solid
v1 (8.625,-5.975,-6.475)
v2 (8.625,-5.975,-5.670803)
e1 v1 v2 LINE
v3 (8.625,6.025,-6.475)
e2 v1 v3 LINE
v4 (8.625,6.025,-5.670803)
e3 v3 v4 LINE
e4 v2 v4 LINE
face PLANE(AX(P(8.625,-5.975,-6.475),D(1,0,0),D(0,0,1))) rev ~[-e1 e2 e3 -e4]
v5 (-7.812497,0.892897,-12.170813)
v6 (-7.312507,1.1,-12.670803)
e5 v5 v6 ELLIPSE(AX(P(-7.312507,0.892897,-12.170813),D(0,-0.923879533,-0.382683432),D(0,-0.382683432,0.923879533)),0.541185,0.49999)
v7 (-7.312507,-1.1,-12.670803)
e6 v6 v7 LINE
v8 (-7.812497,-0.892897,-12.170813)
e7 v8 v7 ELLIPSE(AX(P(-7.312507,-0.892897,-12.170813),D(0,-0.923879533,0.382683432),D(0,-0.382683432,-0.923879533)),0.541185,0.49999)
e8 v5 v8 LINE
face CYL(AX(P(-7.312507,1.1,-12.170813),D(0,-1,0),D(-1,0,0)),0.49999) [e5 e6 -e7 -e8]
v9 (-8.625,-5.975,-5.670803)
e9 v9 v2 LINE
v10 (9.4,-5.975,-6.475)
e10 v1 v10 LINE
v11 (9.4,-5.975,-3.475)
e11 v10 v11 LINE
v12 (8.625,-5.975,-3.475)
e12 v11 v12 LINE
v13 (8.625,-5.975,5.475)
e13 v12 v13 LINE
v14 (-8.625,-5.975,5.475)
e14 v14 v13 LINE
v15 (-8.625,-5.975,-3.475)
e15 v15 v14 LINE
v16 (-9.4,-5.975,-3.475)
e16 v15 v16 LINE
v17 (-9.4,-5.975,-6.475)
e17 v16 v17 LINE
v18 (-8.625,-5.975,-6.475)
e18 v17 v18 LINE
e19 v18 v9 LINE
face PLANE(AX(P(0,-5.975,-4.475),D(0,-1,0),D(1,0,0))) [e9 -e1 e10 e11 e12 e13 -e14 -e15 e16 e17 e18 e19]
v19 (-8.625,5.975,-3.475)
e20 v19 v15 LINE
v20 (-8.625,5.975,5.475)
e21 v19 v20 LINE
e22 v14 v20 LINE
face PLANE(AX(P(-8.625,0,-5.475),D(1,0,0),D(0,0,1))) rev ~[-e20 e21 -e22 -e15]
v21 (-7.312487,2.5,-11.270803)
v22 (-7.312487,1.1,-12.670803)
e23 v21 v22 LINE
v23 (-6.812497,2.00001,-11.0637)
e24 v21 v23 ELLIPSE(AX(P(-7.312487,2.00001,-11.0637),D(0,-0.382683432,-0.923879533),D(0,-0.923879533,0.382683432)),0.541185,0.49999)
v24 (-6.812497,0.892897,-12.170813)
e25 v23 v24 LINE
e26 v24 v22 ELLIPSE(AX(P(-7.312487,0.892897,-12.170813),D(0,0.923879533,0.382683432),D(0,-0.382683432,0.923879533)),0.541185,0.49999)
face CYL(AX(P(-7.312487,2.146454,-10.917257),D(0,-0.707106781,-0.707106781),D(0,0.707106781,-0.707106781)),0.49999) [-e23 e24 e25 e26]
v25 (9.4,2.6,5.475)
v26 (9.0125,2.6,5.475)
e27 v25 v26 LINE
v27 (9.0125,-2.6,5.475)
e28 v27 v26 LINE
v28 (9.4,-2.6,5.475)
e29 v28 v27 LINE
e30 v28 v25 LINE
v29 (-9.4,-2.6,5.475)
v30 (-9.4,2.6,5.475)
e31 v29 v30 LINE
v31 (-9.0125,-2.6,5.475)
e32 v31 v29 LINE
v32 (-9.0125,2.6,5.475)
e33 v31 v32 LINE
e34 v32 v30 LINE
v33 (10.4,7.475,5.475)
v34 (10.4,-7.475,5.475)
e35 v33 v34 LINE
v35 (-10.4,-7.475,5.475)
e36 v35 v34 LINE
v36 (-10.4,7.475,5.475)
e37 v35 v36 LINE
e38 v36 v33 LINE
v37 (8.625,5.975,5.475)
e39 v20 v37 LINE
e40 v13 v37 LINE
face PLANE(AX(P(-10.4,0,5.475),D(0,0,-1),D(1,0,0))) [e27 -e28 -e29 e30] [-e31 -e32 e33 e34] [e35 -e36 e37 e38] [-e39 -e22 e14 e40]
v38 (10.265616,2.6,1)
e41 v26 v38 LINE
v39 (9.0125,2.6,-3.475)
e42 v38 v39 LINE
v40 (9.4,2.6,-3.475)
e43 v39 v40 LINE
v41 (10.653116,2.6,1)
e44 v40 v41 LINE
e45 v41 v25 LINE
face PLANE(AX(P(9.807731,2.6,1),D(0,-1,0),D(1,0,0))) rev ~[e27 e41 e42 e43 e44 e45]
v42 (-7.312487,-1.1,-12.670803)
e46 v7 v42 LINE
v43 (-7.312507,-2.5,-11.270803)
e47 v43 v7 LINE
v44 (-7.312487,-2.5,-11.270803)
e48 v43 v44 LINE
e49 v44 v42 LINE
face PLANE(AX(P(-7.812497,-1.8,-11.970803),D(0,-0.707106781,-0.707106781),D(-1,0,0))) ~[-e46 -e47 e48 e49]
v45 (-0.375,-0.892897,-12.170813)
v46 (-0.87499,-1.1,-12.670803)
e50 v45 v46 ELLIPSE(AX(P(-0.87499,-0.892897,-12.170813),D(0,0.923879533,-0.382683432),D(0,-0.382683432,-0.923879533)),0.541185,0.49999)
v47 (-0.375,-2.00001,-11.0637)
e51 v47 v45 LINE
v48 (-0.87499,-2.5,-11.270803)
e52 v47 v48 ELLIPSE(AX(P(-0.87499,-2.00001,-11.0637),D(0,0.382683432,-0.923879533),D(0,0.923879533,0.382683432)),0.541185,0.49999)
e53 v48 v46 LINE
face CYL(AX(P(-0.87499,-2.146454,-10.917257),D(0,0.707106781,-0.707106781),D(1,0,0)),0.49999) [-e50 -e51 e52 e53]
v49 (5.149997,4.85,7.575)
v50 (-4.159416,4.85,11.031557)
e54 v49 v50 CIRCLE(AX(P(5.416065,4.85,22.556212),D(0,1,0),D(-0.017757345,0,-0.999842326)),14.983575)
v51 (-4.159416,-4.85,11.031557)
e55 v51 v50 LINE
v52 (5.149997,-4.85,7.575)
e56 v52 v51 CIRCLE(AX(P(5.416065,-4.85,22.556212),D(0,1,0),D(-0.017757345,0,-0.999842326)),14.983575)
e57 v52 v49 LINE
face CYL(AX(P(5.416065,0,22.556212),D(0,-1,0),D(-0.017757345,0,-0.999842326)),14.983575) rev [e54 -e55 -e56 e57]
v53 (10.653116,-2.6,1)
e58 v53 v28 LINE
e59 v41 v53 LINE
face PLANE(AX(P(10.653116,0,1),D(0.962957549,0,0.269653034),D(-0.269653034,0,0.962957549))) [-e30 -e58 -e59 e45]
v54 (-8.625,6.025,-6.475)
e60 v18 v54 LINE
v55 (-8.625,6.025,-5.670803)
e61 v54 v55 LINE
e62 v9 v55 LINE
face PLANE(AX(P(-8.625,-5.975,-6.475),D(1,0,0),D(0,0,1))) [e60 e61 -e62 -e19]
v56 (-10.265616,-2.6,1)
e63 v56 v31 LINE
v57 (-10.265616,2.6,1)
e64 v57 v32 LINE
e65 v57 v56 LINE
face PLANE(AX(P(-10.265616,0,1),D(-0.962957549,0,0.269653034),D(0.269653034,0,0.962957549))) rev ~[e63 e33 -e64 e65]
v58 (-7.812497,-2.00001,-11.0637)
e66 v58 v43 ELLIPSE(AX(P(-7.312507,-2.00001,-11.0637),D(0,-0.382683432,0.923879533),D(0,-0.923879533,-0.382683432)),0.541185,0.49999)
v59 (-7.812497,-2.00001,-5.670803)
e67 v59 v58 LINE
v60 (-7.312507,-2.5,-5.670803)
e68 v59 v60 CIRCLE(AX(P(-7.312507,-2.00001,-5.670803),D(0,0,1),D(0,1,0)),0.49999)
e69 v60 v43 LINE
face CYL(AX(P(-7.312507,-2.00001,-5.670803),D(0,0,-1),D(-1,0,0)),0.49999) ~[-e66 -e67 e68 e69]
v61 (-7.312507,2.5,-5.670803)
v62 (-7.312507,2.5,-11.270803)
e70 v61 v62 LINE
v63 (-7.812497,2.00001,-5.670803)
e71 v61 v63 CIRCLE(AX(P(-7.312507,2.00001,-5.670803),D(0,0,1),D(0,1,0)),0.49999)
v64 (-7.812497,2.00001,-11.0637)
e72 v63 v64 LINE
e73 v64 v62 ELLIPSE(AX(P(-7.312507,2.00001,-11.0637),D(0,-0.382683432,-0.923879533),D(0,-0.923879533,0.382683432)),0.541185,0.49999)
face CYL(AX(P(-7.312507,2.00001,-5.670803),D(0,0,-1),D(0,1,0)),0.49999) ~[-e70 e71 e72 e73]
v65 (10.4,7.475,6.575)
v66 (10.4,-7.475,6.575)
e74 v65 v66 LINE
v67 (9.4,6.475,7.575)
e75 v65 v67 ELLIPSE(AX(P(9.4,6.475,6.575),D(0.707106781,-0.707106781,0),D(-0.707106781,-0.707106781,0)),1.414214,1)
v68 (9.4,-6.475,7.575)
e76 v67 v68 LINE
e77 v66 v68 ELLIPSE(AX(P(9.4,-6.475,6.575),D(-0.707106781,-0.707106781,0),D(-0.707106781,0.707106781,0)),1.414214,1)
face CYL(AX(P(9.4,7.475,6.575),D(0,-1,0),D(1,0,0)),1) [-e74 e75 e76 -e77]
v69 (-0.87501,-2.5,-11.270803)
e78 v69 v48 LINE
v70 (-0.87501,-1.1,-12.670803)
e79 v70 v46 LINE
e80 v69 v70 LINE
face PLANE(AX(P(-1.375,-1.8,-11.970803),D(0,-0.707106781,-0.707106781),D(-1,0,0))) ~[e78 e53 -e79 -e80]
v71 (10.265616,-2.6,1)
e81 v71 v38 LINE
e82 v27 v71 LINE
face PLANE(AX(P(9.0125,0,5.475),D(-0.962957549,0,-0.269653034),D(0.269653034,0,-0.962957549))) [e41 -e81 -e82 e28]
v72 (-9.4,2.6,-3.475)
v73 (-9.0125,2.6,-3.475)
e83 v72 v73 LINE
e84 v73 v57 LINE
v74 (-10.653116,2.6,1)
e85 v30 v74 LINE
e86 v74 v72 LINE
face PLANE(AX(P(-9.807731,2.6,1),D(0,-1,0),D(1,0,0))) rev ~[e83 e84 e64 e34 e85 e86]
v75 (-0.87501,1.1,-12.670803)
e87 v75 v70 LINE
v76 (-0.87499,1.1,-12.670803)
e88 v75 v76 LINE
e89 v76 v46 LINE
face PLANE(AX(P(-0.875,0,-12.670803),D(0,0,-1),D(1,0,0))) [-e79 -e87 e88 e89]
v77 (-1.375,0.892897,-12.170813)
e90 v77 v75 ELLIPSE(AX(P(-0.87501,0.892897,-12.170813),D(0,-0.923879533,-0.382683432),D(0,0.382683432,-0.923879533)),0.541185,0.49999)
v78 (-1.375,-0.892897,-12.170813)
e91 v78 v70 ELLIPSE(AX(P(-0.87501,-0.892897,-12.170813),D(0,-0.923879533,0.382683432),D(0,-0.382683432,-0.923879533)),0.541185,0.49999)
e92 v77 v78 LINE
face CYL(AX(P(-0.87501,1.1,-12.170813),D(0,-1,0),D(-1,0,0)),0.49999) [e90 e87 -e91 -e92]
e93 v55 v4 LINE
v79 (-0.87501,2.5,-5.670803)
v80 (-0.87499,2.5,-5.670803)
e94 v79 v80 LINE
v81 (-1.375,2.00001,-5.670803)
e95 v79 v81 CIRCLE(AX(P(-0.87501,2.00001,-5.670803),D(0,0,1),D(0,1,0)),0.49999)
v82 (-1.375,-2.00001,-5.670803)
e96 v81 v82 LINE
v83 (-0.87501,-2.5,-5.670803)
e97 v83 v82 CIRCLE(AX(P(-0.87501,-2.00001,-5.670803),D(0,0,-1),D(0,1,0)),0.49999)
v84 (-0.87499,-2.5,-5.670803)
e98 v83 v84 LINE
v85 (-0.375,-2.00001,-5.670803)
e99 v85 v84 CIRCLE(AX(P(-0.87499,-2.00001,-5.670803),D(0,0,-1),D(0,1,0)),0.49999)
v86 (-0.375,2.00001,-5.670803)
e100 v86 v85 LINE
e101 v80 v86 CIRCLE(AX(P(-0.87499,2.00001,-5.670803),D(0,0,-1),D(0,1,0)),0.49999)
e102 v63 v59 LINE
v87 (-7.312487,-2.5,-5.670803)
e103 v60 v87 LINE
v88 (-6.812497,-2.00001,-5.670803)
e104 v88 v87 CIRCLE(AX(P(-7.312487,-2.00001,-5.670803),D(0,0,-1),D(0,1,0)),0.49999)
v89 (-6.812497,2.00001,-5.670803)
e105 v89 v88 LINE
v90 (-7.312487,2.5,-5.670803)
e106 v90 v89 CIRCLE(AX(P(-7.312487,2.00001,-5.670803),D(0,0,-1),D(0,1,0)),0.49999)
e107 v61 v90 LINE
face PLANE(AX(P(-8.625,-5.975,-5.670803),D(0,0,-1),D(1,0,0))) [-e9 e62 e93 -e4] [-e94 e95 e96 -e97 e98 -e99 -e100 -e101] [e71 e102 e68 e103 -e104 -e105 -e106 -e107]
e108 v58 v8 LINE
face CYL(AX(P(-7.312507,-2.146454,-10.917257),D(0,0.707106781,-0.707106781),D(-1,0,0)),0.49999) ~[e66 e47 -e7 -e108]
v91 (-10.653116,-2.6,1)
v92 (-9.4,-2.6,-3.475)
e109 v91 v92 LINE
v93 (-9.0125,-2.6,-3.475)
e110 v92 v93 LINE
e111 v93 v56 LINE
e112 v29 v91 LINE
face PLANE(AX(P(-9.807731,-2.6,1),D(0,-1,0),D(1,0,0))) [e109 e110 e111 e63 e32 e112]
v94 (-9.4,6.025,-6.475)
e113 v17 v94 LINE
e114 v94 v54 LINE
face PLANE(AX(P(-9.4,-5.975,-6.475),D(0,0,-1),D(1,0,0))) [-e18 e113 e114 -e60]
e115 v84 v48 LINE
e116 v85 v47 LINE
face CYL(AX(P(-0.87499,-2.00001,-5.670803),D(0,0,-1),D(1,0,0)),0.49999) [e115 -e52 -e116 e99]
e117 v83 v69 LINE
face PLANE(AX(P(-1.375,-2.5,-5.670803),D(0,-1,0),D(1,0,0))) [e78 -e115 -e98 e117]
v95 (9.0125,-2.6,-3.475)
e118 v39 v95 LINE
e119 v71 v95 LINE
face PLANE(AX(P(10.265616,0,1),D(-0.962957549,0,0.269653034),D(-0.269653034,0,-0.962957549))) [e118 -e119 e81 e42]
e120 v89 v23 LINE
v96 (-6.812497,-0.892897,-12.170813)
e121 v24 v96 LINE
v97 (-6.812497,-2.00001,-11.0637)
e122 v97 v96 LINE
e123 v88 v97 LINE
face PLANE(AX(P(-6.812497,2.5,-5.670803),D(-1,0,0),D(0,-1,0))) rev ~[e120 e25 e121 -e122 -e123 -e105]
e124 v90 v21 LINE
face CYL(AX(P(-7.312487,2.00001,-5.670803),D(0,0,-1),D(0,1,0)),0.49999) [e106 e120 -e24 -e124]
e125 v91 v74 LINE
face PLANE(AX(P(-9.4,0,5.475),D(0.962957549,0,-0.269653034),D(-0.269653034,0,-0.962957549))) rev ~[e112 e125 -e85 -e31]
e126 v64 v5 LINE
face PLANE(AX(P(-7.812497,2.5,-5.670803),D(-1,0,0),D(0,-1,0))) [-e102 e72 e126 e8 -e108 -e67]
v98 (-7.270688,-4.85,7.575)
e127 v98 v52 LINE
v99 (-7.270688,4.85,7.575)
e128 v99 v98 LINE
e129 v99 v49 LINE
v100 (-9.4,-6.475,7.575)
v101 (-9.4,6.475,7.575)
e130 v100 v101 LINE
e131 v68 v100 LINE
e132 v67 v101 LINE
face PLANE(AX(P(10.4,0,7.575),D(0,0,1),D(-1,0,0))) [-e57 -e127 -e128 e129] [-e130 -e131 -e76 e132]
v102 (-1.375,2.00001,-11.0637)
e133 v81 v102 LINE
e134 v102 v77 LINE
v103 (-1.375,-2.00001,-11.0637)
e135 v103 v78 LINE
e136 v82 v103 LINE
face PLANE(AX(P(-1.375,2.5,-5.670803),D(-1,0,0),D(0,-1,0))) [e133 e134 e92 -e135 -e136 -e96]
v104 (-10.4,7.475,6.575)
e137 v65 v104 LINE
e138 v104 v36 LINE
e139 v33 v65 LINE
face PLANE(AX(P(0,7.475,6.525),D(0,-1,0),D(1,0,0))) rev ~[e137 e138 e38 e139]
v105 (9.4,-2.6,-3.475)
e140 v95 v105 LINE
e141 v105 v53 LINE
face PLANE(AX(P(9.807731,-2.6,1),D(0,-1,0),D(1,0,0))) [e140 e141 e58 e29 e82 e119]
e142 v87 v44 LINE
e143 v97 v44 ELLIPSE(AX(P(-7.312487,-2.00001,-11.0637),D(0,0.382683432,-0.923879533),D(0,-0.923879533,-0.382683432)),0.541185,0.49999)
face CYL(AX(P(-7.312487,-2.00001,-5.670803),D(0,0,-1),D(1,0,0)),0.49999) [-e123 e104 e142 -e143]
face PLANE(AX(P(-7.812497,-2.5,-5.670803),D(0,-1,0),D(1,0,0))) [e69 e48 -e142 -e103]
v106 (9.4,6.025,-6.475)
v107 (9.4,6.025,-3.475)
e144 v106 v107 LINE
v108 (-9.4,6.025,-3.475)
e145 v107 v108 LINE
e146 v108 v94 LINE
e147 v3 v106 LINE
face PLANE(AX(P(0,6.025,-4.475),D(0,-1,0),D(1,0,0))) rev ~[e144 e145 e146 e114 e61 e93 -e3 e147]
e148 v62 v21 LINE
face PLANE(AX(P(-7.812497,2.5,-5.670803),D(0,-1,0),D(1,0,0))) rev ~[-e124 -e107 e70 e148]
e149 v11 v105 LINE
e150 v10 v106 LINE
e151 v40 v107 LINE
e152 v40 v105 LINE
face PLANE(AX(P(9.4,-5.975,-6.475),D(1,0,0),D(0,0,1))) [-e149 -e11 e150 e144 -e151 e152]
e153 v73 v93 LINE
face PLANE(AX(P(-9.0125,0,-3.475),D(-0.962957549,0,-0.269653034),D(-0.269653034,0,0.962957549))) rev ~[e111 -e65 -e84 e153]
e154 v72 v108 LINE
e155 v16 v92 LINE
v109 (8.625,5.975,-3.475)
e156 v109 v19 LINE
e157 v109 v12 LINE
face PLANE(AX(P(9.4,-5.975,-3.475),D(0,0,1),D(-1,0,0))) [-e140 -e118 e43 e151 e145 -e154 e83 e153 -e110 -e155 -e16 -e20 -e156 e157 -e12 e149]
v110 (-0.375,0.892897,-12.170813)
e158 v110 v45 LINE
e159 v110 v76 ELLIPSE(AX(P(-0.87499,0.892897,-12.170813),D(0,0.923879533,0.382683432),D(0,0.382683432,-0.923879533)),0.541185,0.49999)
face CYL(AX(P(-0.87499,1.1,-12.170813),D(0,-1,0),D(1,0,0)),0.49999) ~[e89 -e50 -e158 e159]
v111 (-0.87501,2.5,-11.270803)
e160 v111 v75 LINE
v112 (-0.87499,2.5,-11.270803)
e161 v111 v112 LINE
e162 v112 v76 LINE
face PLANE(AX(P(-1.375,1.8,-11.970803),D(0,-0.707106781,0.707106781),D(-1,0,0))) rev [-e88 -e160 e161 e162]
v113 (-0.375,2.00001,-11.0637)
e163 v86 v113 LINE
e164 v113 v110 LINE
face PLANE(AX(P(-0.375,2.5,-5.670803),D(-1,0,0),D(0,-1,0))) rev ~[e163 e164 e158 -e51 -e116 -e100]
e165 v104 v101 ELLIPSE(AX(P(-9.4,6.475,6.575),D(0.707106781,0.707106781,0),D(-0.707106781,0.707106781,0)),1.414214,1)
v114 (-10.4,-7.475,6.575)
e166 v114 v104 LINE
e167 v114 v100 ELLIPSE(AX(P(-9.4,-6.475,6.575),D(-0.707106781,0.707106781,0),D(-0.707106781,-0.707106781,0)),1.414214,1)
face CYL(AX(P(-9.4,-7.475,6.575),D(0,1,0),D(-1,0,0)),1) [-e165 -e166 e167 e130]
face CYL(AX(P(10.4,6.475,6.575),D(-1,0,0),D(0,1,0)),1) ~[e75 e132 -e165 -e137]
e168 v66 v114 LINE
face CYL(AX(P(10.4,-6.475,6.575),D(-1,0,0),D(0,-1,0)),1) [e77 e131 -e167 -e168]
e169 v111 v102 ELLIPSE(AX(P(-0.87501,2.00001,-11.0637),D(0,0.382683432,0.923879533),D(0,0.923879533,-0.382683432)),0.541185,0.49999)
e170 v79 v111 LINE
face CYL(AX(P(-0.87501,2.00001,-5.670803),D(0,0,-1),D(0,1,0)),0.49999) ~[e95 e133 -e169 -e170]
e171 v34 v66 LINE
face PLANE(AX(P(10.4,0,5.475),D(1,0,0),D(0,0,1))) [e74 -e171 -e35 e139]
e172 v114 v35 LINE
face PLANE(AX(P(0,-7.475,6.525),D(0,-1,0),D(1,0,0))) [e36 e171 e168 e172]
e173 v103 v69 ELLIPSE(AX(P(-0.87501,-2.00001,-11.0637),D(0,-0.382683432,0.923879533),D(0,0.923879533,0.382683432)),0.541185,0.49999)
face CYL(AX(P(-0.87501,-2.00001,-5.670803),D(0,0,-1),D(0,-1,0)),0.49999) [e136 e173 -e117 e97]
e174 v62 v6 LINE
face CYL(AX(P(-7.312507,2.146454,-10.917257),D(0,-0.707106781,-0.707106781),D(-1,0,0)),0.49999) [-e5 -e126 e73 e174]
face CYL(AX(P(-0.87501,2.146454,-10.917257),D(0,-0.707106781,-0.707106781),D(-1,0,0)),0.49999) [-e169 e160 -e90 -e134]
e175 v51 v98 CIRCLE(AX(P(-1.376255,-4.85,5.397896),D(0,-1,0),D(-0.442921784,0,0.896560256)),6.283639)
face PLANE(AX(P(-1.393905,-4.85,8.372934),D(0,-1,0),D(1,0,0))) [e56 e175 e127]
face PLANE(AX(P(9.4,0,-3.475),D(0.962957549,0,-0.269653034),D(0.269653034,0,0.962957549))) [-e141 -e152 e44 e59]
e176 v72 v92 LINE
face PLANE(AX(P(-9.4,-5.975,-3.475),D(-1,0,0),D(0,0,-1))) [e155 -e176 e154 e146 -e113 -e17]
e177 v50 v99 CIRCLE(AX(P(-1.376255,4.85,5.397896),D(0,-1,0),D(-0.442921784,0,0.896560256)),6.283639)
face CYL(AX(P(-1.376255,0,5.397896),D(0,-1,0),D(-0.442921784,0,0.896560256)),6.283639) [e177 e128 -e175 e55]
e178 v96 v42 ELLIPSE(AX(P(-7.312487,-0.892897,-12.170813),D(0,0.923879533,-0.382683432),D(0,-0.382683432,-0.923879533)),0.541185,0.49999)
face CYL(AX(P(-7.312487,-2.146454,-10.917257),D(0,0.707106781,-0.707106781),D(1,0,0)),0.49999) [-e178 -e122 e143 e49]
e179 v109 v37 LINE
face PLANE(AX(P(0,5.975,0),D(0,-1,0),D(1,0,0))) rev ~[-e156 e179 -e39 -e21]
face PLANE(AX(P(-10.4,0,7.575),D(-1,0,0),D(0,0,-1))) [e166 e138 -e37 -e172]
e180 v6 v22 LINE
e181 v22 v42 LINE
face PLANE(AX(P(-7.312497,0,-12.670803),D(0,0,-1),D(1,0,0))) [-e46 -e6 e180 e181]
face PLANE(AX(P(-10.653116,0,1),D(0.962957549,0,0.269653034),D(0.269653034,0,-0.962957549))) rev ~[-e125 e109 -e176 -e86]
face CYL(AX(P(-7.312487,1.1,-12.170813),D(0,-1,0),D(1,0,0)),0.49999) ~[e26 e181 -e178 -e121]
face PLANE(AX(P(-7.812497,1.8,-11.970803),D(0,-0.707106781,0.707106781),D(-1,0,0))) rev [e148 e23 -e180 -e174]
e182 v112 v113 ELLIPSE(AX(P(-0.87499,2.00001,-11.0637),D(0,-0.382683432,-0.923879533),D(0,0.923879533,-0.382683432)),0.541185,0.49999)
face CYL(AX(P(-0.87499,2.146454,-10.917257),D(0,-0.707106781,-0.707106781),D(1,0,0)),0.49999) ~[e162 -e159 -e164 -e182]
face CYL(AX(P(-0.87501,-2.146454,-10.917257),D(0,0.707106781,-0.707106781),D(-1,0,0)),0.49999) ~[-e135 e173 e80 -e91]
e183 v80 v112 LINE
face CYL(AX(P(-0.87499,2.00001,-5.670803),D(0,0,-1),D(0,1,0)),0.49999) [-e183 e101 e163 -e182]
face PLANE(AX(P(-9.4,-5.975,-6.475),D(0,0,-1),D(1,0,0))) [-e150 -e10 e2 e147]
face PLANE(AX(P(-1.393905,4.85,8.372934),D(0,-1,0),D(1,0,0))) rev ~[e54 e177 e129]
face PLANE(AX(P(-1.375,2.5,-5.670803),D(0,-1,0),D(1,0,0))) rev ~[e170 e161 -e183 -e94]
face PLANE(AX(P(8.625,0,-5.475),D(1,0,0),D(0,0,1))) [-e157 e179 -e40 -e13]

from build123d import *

# Parameters (mm, degrees)
F0_W      = 17.25
F0_H      = 10.95
F1_DEPTH  = 5.975
F3_DEPTH  = 12
F4_W      = 17.25
F4_H      = 0.8041968666
F5_DEPTH  = 12.001
F7_DEPTH  = 2.6
F9_DEPTH  = 7.475
F10_W     = 1
F10_H     = 5
F11_DEPTH = 7
F12_SIZE  = 1.4
F13_R     = 0.49999
F14_R     = 1
F16_DEPTH = 4.85


# Not quite as in the source:
# - a fillet or chamfer is up to 0.001 mm smaller than in the source, because OpenCascade refuses the exact size


with BuildPart() as f1:
    # F0 (on Front) → F1 (new body, symmetric)
    with BuildSketch(Plane.XZ):
        Rectangle(F0_W, F0_H)
    extrude(amount=F1_DEPTH, both=True)

    # F2 (on face) → F3 (join)
    with BuildSketch(Plane.XZ.offset(5.975)):
        Polygon((-8.625, -5.475), (8.625, -5.475), (8.625, -3.475), (0, -3.475), (-8.625, -3.475), align=None)
        Polygon((8.625, -3.475), (8.625, -5.475), (-8.625, -5.475), (-8.625, -3.475), (-9.4, -3.475), (-9.4, -6.475), (0, -6.475), (9.4, -6.475), (9.4, -3.475), align=None)
    extrude(amount=-F3_DEPTH)

    # F4 (on face) → F5 (cut, through all)
    with BuildSketch(Plane.XZ.offset(5.975)):
        with Locations((0, -6.0729015667)):
            Rectangle(F4_W, F4_H)
    extrude(amount=-F5_DEPTH, mode=Mode.SUBTRACT)

    # F6 (on Front) → F7 (join, symmetric)
    with BuildSketch(Plane.XZ):
        Polygon((-10.653115809, 1), (-9.4, -3.475), (-9.0125, -3.475), (-10.265615809, 1), (-9.0125, 5.475), (-9.4, 5.475), align=None)
        Polygon((10.265615809, 1), (9.0125, -3.475), (9.4, -3.475), (10.653115809, 1), (9.4, 5.475), (9.0125, 5.475), align=None)
    extrude(amount=F7_DEPTH, both=True)

    # F8 (on Front) → F9 (join, symmetric)
    with BuildSketch(Plane.XZ):
        Polygon((-10.4, 5.475), (-8.625, 5.475), (8.625, 5.475), (10.4, 5.475), (10.4, 7.575), (-10.4, 7.575), align=None)
    extrude(amount=F9_DEPTH, both=True)

    # F10 (on face) → F11 (join)
    with BuildSketch(Plane(origin=(0, 0, -5.6708031334), x_dir=(1, 0, 0), z_dir=(0, 0, -1))):
        with Locations((-7.3124970421, 0)):
            Rectangle(F10_W, F10_H)
        with Locations((-0.875, 0)):
            Rectangle(F10_W, F10_H)
    extrude(amount=F11_DEPTH)

    # F12
    f12_edges = [f1.edges().sort_by_distance(p)[0] for p in [
        (-7.312497, -2.5, -12.670803),
        (-7.312497, 2.5, -12.670803),
        (-0.875, -2.5, -12.670803),
        (-0.875, 2.5, -12.670803),
    ]]
    chamfer(f12_edges, length=F12_SIZE)

    # F13 (radius 0.5 in the source; OpenCascade refuses exactly that, so slightly less here)
    f13_edges = [f1.edges().sort_by_distance(p)[0] for p in [
        (-6.812497, -2.5, -8.470803),
        (-7.812497, -2.5, -8.470803),
        (-6.812497, -1.8, -11.970803),
        (-7.812497, -1.8, -11.970803),
        (-6.812497, 0, -12.670803),
        (-7.812497, 0, -12.670803),
        (-6.812497, 1.8, -11.970803),
        (-7.812497, 1.8, -11.970803),
        (-6.812497, 2.5, -8.470803),
        (-7.812497, 2.5, -8.470803),
        (-0.375, 2.5, -8.470803),
        (-1.375, 2.5, -8.470803),
        (-0.375, 1.8, -11.970803),
        (-1.375, 1.8, -11.970803),
        (-0.375, 0, -12.670803),
        (-1.375, 0, -12.670803),
        (-0.375, -1.8, -11.970803),
        (-1.375, -1.8, -11.970803),
        (-0.375, -2.5, -8.470803),
        (-1.375, -2.5, -8.470803),
    ]]
    fillet(f13_edges, radius=F13_R)

    # F14
    f14_edges = [f1.edges().sort_by_distance(p)[0] for p in [
        (0, -7.475, 7.575),
        (10.4, 0, 7.575),
        (0, 7.475, 7.575),
        (-10.4, 0, 7.575),
    ]]
    fillet(f14_edges, radius=F14_R)

    # F15 (on Front) → F16 (join, symmetric)
    with BuildSketch(Plane.XZ):
        with BuildLine():
            ThreePointArc((-4.1594156064, 11.0315568745), (-6.0465979045, 9.6017056311), (-7.2706877254, 7.575))
            Line((-7.2706877254, 7.575), (5.1499965846, 7.575))
            ThreePointArc((5.1499965846, 7.575), (0.2006102654, 8.5096274816), (-4.1594156064, 11.0315568745))
        make_face()
    extrude(amount=F16_DEPTH, both=True)


solid = f1.part
